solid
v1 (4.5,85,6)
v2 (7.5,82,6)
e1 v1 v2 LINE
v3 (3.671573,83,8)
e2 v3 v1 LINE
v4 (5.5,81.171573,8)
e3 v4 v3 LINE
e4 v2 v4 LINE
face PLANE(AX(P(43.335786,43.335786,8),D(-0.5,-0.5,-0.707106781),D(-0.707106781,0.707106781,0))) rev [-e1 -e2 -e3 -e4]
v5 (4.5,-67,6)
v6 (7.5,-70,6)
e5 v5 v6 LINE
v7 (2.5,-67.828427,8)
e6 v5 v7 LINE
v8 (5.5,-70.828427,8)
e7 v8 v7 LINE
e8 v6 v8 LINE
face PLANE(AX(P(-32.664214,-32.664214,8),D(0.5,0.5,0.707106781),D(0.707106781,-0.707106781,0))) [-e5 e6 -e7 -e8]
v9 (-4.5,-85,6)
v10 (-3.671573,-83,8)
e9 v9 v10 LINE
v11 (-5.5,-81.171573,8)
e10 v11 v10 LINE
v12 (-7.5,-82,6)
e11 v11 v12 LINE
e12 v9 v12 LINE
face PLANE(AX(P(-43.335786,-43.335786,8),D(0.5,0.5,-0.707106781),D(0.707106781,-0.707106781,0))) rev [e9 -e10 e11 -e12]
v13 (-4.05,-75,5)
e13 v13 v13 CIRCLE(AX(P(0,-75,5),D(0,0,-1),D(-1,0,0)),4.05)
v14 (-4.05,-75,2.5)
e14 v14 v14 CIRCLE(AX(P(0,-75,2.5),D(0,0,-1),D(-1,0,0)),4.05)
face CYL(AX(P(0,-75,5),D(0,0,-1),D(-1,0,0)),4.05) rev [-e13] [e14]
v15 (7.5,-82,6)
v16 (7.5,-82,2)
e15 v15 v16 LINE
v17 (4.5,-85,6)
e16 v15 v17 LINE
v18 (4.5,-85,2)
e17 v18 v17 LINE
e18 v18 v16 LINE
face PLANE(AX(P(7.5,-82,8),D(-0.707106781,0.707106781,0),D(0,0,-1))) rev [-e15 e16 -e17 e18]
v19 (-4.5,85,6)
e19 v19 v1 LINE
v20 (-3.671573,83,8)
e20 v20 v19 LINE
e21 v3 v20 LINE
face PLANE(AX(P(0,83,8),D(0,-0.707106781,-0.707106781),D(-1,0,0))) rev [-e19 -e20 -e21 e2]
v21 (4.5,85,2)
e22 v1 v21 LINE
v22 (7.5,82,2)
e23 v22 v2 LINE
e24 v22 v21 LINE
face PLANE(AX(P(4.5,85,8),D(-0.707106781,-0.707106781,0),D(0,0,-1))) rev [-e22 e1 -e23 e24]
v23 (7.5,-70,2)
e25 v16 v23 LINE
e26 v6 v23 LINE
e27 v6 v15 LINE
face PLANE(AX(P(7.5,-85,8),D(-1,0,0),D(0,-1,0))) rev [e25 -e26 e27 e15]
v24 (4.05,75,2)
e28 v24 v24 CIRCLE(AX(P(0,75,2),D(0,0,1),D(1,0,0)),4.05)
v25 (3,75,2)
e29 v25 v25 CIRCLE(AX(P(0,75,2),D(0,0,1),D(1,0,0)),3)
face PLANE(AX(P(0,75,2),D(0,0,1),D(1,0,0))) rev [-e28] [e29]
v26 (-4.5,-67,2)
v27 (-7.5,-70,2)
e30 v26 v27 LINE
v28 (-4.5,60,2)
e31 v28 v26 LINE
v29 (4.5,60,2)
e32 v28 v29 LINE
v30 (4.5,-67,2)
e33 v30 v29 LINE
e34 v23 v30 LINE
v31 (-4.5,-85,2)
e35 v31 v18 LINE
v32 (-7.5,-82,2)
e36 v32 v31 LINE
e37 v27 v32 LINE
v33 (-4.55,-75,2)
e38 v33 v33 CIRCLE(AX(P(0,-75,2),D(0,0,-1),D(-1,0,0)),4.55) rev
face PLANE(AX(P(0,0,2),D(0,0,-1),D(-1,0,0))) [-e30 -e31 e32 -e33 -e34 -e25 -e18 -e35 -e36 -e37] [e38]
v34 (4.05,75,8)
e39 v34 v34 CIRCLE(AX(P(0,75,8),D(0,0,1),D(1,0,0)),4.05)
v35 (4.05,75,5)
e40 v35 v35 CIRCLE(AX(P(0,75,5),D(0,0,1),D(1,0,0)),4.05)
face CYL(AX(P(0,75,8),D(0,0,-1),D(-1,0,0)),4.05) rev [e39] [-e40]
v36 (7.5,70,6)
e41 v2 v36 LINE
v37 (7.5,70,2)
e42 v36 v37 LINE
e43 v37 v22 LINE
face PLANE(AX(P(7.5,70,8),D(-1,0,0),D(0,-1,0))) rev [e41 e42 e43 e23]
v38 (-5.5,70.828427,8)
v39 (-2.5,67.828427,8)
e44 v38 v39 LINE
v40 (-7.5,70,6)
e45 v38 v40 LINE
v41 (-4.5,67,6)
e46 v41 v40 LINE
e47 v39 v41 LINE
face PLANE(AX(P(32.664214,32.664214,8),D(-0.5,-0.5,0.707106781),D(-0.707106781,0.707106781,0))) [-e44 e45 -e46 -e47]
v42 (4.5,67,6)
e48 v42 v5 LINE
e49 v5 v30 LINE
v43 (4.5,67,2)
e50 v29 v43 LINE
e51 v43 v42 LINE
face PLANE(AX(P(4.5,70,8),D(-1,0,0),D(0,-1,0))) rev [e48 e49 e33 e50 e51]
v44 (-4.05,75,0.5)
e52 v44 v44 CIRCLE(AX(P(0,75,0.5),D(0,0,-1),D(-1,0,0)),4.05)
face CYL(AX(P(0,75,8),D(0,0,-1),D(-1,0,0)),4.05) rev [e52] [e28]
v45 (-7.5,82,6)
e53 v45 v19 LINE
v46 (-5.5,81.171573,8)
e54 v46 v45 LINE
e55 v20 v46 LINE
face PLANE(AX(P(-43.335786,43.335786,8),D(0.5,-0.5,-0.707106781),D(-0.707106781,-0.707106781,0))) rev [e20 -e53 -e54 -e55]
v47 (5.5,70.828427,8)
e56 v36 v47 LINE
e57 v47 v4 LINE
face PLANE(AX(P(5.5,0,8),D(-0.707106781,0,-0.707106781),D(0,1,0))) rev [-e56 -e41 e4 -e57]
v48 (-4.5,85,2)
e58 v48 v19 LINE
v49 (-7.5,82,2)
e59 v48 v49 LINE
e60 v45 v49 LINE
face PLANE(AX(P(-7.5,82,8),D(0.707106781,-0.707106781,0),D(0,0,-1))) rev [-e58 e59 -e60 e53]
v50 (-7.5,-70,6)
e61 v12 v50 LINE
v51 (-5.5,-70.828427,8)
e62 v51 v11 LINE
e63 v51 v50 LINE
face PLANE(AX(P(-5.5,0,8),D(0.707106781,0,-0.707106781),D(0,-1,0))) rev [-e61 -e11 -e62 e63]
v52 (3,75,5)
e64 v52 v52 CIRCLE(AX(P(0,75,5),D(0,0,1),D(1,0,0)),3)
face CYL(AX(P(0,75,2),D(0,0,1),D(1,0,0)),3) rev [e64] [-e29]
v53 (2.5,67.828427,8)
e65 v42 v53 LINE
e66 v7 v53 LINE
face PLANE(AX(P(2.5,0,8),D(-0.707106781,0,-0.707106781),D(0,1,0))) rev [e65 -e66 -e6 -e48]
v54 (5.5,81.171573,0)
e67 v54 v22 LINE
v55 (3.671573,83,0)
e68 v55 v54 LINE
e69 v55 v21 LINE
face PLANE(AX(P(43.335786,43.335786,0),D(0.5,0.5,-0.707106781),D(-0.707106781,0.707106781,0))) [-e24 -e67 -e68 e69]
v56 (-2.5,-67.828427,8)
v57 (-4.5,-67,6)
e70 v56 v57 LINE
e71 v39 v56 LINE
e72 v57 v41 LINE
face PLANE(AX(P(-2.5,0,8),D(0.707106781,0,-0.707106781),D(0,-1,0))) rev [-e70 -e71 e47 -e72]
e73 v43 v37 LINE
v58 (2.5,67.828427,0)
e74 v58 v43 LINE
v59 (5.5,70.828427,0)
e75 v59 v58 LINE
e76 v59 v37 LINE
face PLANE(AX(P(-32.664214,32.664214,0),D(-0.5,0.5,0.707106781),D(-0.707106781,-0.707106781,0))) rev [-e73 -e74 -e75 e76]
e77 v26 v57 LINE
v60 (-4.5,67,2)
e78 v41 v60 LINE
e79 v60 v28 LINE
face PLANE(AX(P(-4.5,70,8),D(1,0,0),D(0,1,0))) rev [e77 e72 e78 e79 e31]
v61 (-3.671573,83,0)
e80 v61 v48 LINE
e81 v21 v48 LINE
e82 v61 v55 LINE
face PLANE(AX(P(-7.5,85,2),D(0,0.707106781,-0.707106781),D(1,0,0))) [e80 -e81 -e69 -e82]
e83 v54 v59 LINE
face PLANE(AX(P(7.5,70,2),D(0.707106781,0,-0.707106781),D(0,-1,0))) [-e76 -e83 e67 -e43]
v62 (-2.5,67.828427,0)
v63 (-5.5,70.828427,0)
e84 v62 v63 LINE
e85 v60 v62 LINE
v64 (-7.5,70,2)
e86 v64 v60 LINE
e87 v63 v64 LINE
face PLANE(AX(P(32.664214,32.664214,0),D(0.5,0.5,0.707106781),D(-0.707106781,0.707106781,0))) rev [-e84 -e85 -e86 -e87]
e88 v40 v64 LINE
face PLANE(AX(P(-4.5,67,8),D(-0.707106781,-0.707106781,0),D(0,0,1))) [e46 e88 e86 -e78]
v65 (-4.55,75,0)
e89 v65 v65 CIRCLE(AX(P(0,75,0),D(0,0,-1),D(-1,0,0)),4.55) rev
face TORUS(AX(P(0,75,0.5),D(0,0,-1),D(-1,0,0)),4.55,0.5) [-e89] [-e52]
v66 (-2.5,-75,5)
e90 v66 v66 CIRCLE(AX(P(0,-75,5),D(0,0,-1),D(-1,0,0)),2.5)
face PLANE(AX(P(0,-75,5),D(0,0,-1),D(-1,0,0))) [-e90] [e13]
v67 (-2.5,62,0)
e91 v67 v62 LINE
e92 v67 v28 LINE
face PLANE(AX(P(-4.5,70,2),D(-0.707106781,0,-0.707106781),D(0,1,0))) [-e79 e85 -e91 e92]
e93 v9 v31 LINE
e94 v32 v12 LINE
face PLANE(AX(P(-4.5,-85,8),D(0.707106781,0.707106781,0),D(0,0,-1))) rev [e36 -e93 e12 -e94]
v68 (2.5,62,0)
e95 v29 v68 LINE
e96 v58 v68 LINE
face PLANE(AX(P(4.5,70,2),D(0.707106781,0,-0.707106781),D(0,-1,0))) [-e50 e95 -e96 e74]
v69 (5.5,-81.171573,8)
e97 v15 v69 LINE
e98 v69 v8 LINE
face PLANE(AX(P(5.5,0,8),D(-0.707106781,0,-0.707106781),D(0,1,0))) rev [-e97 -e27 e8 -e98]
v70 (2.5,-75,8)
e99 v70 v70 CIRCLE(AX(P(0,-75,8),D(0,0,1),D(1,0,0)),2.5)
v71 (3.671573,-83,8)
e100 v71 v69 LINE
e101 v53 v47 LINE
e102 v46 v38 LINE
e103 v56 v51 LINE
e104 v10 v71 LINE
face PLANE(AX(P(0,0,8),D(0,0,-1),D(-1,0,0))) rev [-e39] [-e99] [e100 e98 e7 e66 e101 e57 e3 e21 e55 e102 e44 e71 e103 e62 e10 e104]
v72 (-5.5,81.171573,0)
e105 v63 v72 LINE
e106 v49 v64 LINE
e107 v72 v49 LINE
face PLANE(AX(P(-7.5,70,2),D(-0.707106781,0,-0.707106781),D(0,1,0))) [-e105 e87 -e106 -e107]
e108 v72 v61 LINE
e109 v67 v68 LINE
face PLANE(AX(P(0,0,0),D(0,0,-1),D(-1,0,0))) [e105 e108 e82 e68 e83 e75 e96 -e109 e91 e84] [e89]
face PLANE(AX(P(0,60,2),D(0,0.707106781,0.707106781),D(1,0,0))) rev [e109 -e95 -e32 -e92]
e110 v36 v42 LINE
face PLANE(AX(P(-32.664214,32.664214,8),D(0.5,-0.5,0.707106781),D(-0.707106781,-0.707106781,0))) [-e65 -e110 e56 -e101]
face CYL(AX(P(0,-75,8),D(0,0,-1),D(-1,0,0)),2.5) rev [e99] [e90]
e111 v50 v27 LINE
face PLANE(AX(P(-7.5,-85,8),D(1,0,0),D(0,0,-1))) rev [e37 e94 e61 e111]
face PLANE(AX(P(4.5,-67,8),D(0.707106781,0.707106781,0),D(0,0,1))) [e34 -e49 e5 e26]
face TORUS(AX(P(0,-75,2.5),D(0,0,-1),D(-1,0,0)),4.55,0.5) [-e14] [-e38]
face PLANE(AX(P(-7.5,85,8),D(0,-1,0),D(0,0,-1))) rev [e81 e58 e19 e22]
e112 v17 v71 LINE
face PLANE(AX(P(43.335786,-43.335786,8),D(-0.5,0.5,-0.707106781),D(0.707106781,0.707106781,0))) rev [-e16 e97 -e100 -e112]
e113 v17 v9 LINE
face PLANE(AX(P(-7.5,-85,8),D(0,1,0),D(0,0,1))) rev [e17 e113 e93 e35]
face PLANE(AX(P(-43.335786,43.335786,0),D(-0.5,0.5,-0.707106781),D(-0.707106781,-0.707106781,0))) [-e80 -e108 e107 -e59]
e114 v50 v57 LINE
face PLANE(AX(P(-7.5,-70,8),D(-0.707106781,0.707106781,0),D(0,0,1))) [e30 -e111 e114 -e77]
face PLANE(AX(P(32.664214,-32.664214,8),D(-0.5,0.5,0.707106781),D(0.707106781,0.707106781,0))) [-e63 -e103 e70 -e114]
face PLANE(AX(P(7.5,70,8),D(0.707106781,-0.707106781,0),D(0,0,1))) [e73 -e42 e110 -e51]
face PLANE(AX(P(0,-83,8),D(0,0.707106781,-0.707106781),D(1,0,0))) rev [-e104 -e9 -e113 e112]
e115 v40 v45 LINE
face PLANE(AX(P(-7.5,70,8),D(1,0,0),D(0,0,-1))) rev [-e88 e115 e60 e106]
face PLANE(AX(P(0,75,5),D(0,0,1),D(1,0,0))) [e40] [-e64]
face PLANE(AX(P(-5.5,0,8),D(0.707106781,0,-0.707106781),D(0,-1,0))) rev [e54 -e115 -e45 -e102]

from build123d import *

# Parameters (mm, degrees)
SKETCH_1_R           = 2.5
SKETCH_1_R_2         = 4.05
EXTRUDE_1_DEPTH      = 8
CHAMFER_2_SIZE       = 3
EXTRUDE_2_DEPTH      = 1
EXTRUDE_2_DEPTH_BACK = 2
SKETCH_2_R           = 4.05
SKETCH_2_R_2         = 3
CHAMFER_3_SIZE       = 2
CHAMFER_4_SIZE       = 2
FILLET_1_R           = 0.5
FILLET_2_R           = 0.5
SKETCH_3_W           = 18.755341831
SKETCH_3_H           = 148.115808698
CUT_EXTRUDE_1_DEPTH  = 2
CHAMFER_5_SIZE       = 2
SKETCH_4_R           = 4.05
CUT_EXTRUDE_2_DEPTH  = 3
FILLET_3_R           = 0.5


# Some blends are built 0.0001 mm under size
with BuildPart() as part:
    # 草图1 → 凸台-拉伸1 (new body)
    with BuildSketch(Plane.XY):
        Polygon((-7.5, 70), (-4.5, 70), (-4.5, -70), (-7.5, -70), (-7.5, -85), (7.5, -85), (7.5, -70), (4.5, -70), (4.5, 70), (7.5, 70), (7.5, 85), (-7.5, 85), align=None)
        with Locations((0, -75)):
            Circle(SKETCH_1_R, mode=Mode.SUBTRACT)
        with Locations((0, 75)):
            Circle(SKETCH_1_R_2, mode=Mode.SUBTRACT)
    extrude(amount=EXTRUDE_1_DEPTH)

    # 倒角2
    chamfer_2_edges = [part.edges().sort_by_distance(p)[0] for p in [
        (-4.5, -70, 4),
        (4.5, -70, 4),
        (-4.5, 70, 4),
        (4.5, 70, 4),
    ]]
    chamfer(chamfer_2_edges, length=CHAMFER_2_SIZE - 0.0001)  # a hair under: the kernel refuses the full size
    chamfer_2_2_edges = [part.edges().sort_by_distance(p)[0] for p in [
        (7.5, -85, 4),
        (-7.5, -85, 4),
        (7.5, 85, 4),
        (-7.5, 85, 4),
    ]]
    chamfer(chamfer_2_2_edges, length=CHAMFER_2_SIZE)

    # 草图2 → 凸台-拉伸2 (add, two sides: drawn at the far end of the back side and taken through both)
    with BuildSketch(Plane.XY.offset(4).offset(-EXTRUDE_2_DEPTH_BACK)):
        with Locations((0, 75)):
            Circle(SKETCH_2_R)
        with Locations((0, 75)):
            Circle(SKETCH_2_R_2, mode=Mode.SUBTRACT)
    extrude(amount=EXTRUDE_2_DEPTH + EXTRUDE_2_DEPTH_BACK)

    # 倒角3
    # the kernel refuses this chamfer: 2 mm, written as the material it takes off along each edge
    with BuildSketch(Plane(origin=(-7.5, -64.856634024, 8), x_dir=(-0.027495876610586487, 0, -0.9996219169112968), z_dir=(0, -1, 0)), Plane(origin=(7.5, -87.143365976, 8), x_dir=(0.027495876610586487, 0, -0.9996219169112968), z_dir=(0, 1, 0)), Plane(origin=(7.5, 64.856634024, 8), x_dir=(0.027495876610586487, 0, -0.9996219169112968), z_dir=(0, 1, 0)), Plane(origin=(-7.5, 87.143365976, 8), x_dir=(-0.027495876610586487, 0, -0.9996219169112968), z_dir=(0, -1, 0))) as chamfer_3_piece_1:
        Polygon((CHAMFER_3_SIZE * 0.999621916911, CHAMFER_3_SIZE * 0.0274958766106), (-CHAMFER_3_SIZE * 0.0274958766106, CHAMFER_3_SIZE * 0.999621916911), (0, 0), align=None)
    extrude(amount=22.286731952, mode=Mode.SUBTRACT)
    with BuildSketch(Plane(origin=(-4.5, 72.143465976, 8), x_dir=(-0.027495876610586487, 0, -0.9996219169112968), z_dir=(0, -1, 0))) as chamfer_3_piece_2_section:
        Polygon((CHAMFER_3_SIZE * 0.999621916911, CHAMFER_3_SIZE * 0.0274958766106), (-CHAMFER_3_SIZE * 0.0274958766106, CHAMFER_3_SIZE * 0.999621916911), (0, 0), align=None)
    chamfer_3_piece_2 = extrude(amount=144.286931952, mode=Mode.PRIVATE)
    chamfer_3_piece_2 = split(chamfer_3_piece_2, bisect_by=Plane(origin=(29.327929184, 33.172170816, 7.338365808), z_dir=(-0.7071067811865471, -0.7071067811865479, 0)), keep=Keep.TOP, mode=Mode.PRIVATE)
    chamfer_3_piece_2 = split(chamfer_3_piece_2, bisect_by=Plane(origin=(29.327929184, -33.172170816, 7.338365808), z_dir=(-0.7071067811865472, 0.7071067811865479, 0)), keep=Keep.TOP, mode=Mode.PRIVATE)
    add(chamfer_3_piece_2, mode=Mode.SUBTRACT)
    with BuildSketch(Plane(origin=(4.5, -72.143465976, 8), x_dir=(0.027495876610586487, 0, -0.9996219169112968), z_dir=(0, 1, 0))) as chamfer_3_piece_3_section:
        Polygon((CHAMFER_3_SIZE * 0.999621916911, CHAMFER_3_SIZE * 0.0274958766106), (-CHAMFER_3_SIZE * 0.0274958766106, CHAMFER_3_SIZE * 0.999621916911), (0, 0), align=None)
    chamfer_3_piece_3 = extrude(amount=144.286931952, mode=Mode.PRIVATE)
    chamfer_3_piece_3 = split(chamfer_3_piece_3, bisect_by=Plane(origin=(-29.327929184, 33.172170816, 7.338365808), z_dir=(0.7071067811865471, -0.7071067811865479, 0)), keep=Keep.TOP, mode=Mode.PRIVATE)
    chamfer_3_piece_3 = split(chamfer_3_piece_3, bisect_by=Plane(origin=(-29.327929184, -33.172170816, 7.338365808), z_dir=(0.7071067811865472, 0.7071067811865479, 0)), keep=Keep.TOP, mode=Mode.PRIVATE)
    add(chamfer_3_piece_3, mode=Mode.SUBTRACT)
    with BuildSketch(Plane(origin=(-9.643365976, -85, 8), x_dir=(0, -0.02749587661058907, -0.9996219169112965), z_dir=(1, 0, 0)), Plane(origin=(9.643365976, 85, 8), x_dir=(0, 0.02749587661058907, -0.9996219169112965), z_dir=(-1, 0, 0))) as chamfer_3_piece_4:
        Polygon((CHAMFER_3_SIZE * 0.999621916911, CHAMFER_3_SIZE * 0.0274958766106), (-CHAMFER_3_SIZE * 0.0274958766106, CHAMFER_3_SIZE * 0.999621916911), (0, 0), align=None)
    extrude(amount=19.286731952, mode=Mode.SUBTRACT)
    with BuildSketch(Plane(origin=(-11.13690896, 78.36309104, 8), x_dir=(-0.019442520806016377, 0.019442520806016377, -0.9996219169112965), z_dir=(0.7071067811865476, 0.7071067811865476, 0)), Plane(origin=(0.86309104, 88.63690896, 8), x_dir=(0.019442520806015953, 0.019442520806015946, -0.9996219169112968), z_dir=(0.7071067811865475, -0.7071067811865476, 0))) as chamfer_3_piece_5:
        Polygon((CHAMFER_3_SIZE * 0.999621916911, -CHAMFER_3_SIZE * 0.0274958766106), (-CHAMFER_3_SIZE * 0.0274958766106, -CHAMFER_3_SIZE * 0.999621916911), (0, 0), align=None)
    extrude(amount=14.529372639, mode=Mode.SUBTRACT)
    with BuildSketch(Plane(origin=(-11.13690896, -78.36309104, 8), x_dir=(-0.019442520806016377, -0.019442520806016377, -0.9996219169112965), z_dir=(0.7071067811865476, -0.7071067811865476, 0)), Plane(origin=(0.86309104, -88.63690896, 8), x_dir=(0.019442520806015953, -0.019442520806015946, -0.9996219169112968), z_dir=(0.7071067811865475, 0.7071067811865476, 0))) as chamfer_3_piece_6:
        Polygon((CHAMFER_3_SIZE * 0.999621916911, CHAMFER_3_SIZE * 0.0274958766106), (-CHAMFER_3_SIZE * 0.0274958766106, CHAMFER_3_SIZE * 0.999621916911), (0, 0), align=None)
    extrude(amount=14.529372639, mode=Mode.SUBTRACT)
    with BuildSketch(Plane(origin=(-0.86309104, -63.36319104, 8), x_dir=(-0.01944252080601354, 0.019442520806013556, -0.9996219169112968), z_dir=(-0.7071067811865479, -0.7071067811865472, 0))) as chamfer_3_piece_7_section:
        Polygon((CHAMFER_3_SIZE * 0.999621916911, CHAMFER_3_SIZE * 0.0274958766106), (-CHAMFER_3_SIZE * 0.0274958766106, CHAMFER_3_SIZE * 0.999621916911), (0, 0), align=None)
    chamfer_3_piece_7 = extrude(amount=14.529231218, mode=Mode.PRIVATE)
    chamfer_3_piece_7 = split(chamfer_3_piece_7, bisect_by=Plane(origin=(-4.5, -68.843566402, 7.247508302), z_dir=(-1, 0, 0)), keep=Keep.TOP, mode=Mode.PRIVATE)
    add(chamfer_3_piece_7, mode=Mode.SUBTRACT)
    with BuildSketch(Plane(origin=(11.13680896, -73.63690896, 8), x_dir=(0.019442520806015506, 0.019442520806015526, -0.9996219169112968), z_dir=(-0.7071067811865479, 0.7071067811865472, 0))) as chamfer_3_piece_8_section:
        Polygon((CHAMFER_3_SIZE * 0.999621916911, CHAMFER_3_SIZE * 0.0274958766106), (-CHAMFER_3_SIZE * 0.0274958766106, CHAMFER_3_SIZE * 0.999621916911), (0, 0), align=None)
    chamfer_3_piece_8 = extrude(amount=14.529231218, mode=Mode.PRIVATE)
    chamfer_3_piece_8 = split(chamfer_3_piece_8, bisect_by=Plane(origin=(4.5, -72.06712973, 7.36381375), z_dir=(1, 0, 0)), keep=Keep.TOP, mode=Mode.PRIVATE)
    add(chamfer_3_piece_8, mode=Mode.SUBTRACT)
    with BuildSketch(Plane(origin=(-11.13680896, 73.63690896, 8), x_dir=(-0.019442520806015506, -0.019442520806015526, -0.9996219169112968), z_dir=(0.7071067811865479, -0.7071067811865471, 0))) as chamfer_3_piece_9_section:
        Polygon((CHAMFER_3_SIZE * 0.999621916911, CHAMFER_3_SIZE * 0.0274958766106), (-CHAMFER_3_SIZE * 0.0274958766106, CHAMFER_3_SIZE * 0.999621916911), (0, 0), align=None)
    chamfer_3_piece_9 = extrude(amount=14.529231218, mode=Mode.PRIVATE)
    chamfer_3_piece_9 = split(chamfer_3_piece_9, bisect_by=Plane(origin=(-4.5, 72.06712973, 7.36381375), z_dir=(-1, 0, 0)), keep=Keep.TOP, mode=Mode.PRIVATE)
    add(chamfer_3_piece_9, mode=Mode.SUBTRACT)
    with BuildSketch(Plane(origin=(0.86309104, 63.36319104, 8), x_dir=(0.019442520806013806, -0.019442520806013826, -0.9996219169112968), z_dir=(0.7071067811865479, 0.7071067811865471, 0))) as chamfer_3_piece_10_section:
        Polygon((CHAMFER_3_SIZE * 0.999621916911, CHAMFER_3_SIZE * 0.0274958766106), (-CHAMFER_3_SIZE * 0.0274958766106, CHAMFER_3_SIZE * 0.999621916911), (0, 0), align=None)
    chamfer_3_piece_10 = extrude(amount=14.529231218, mode=Mode.PRIVATE)
    chamfer_3_piece_10 = split(chamfer_3_piece_10, bisect_by=Plane(origin=(4.5, 68.843566402, 7.247508302), z_dir=(1, 0, 0)), keep=Keep.TOP, mode=Mode.PRIVATE)
    add(chamfer_3_piece_10, mode=Mode.SUBTRACT)
    with BuildSketch(Plane(origin=(-11.13680896, 73.63690896, 8), x_dir=(-0.019442520806015506, -0.019442520806015526, -0.9996219169112968), z_dir=(0.7071067811865479, -0.7071067811865471, 0))) as chamfer_3_piece_11a_section:
        Polygon((CHAMFER_3_SIZE * 0.999621916911, CHAMFER_3_SIZE * 0.0274958766106), (-CHAMFER_3_SIZE * 0.0274958766106, CHAMFER_3_SIZE * 0.999621916911), (0, 0), align=None)
    chamfer_3_piece_11a = extrude(amount=14.529231218, mode=Mode.PRIVATE)
    chamfer_3_piece_11a = split(chamfer_3_piece_11a, bisect_by=Plane(origin=(-4.5, 65.927671271, 7.36381375), z_dir=(1, 0, 0)), keep=Keep.TOP, mode=Mode.PRIVATE)
    with BuildSketch(Plane(origin=(-4.5, 72.143465976, 8), x_dir=(-0.027495876610586487, 0, -0.9996219169112968), z_dir=(0, -1, 0))) as chamfer_3_piece_11b_section:
        Polygon((CHAMFER_3_SIZE * 0.999621916911, CHAMFER_3_SIZE * 0.0274958766106), (-CHAMFER_3_SIZE * 0.0274958766106, CHAMFER_3_SIZE * 0.999621916911), (0, 0), align=None)
    chamfer_3_piece_11b = extrude(amount=144.286931952, mode=Mode.PRIVATE)
    chamfer_3_piece_11b = split(chamfer_3_piece_11b, bisect_by=Plane(origin=(-5.258321627, 67.758421627, 7.36381375), z_dir=(0.7071067811865471, 0.7071067811865479, 0)), keep=Keep.TOP, mode=Mode.PRIVATE)
    chamfer_3_piece_11 = chamfer_3_piece_11a & chamfer_3_piece_11b
    add(chamfer_3_piece_11, mode=Mode.SUBTRACT)
    with BuildSketch(Plane(origin=(-4.5, 72.143465976, 8), x_dir=(-0.027495876610586487, 0, -0.9996219169112968), z_dir=(0, -1, 0))) as chamfer_3_piece_12a_section:
        Polygon((CHAMFER_3_SIZE * 0.999621916911, CHAMFER_3_SIZE * 0.0274958766106), (-CHAMFER_3_SIZE * 0.0274958766106, CHAMFER_3_SIZE * 0.999621916911), (0, 0), align=None)
    chamfer_3_piece_12a = extrude(amount=144.286931952, mode=Mode.PRIVATE)
    chamfer_3_piece_12a = split(chamfer_3_piece_12a, bisect_by=Plane(origin=(-5.258321627, -67.758421627, 7.36381375), z_dir=(0.7071067811865472, -0.7071067811865479, 0)), keep=Keep.TOP, mode=Mode.PRIVATE)
    with BuildSketch(Plane(origin=(-0.86309104, -63.36319104, 8), x_dir=(-0.01944252080601354, 0.019442520806013556, -0.9996219169112968), z_dir=(-0.7071067811865479, -0.7071067811865472, 0))) as chamfer_3_piece_12b_section:
        Polygon((CHAMFER_3_SIZE * 0.999621916911, CHAMFER_3_SIZE * 0.0274958766106), (-CHAMFER_3_SIZE * 0.0274958766106, CHAMFER_3_SIZE * 0.999621916911), (0, 0), align=None)
    chamfer_3_piece_12b = extrude(amount=14.529231218, mode=Mode.PRIVATE)
    chamfer_3_piece_12b = split(chamfer_3_piece_12b, bisect_by=Plane(origin=(-4.5, -65.927671271, 7.36381375), z_dir=(1, 0, 0)), keep=Keep.TOP, mode=Mode.PRIVATE)
    chamfer_3_piece_12 = chamfer_3_piece_12a & chamfer_3_piece_12b
    add(chamfer_3_piece_12, mode=Mode.SUBTRACT)
    with BuildSketch(Plane(origin=(4.5, -72.143465976, 8), x_dir=(0.027495876610586487, 0, -0.9996219169112968), z_dir=(0, 1, 0))) as chamfer_3_piece_13a_section:
        Polygon((CHAMFER_3_SIZE * 0.999621916911, CHAMFER_3_SIZE * 0.0274958766106), (-CHAMFER_3_SIZE * 0.0274958766106, CHAMFER_3_SIZE * 0.999621916911), (0, 0), align=None)
    chamfer_3_piece_13a = extrude(amount=144.286931952, mode=Mode.PRIVATE)
    chamfer_3_piece_13a = split(chamfer_3_piece_13a, bisect_by=Plane(origin=(5.258321627, -67.758421627, 7.36381375), z_dir=(-0.7071067811865472, -0.7071067811865479, 0)), keep=Keep.TOP, mode=Mode.PRIVATE)
    with BuildSketch(Plane(origin=(11.13680896, -73.63690896, 8), x_dir=(0.019442520806015506, 0.019442520806015526, -0.9996219169112968), z_dir=(-0.7071067811865479, 0.7071067811865472, 0))) as chamfer_3_piece_13b_section:
        Polygon((CHAMFER_3_SIZE * 0.999621916911, CHAMFER_3_SIZE * 0.0274958766106), (-CHAMFER_3_SIZE * 0.0274958766106, CHAMFER_3_SIZE * 0.999621916911), (0, 0), align=None)
    chamfer_3_piece_13b = extrude(amount=14.529231218, mode=Mode.PRIVATE)
    chamfer_3_piece_13b = split(chamfer_3_piece_13b, bisect_by=Plane(origin=(4.5, -65.927671271, 7.36381375), z_dir=(-1, 0, 0)), keep=Keep.TOP, mode=Mode.PRIVATE)
    chamfer_3_piece_13 = chamfer_3_piece_13a & chamfer_3_piece_13b
    add(chamfer_3_piece_13, mode=Mode.SUBTRACT)
    with BuildSketch(Plane(origin=(0.86309104, 63.36319104, 8), x_dir=(0.019442520806013806, -0.019442520806013826, -0.9996219169112968), z_dir=(0.7071067811865479, 0.7071067811865471, 0))) as chamfer_3_piece_14a_section:
        Polygon((CHAMFER_3_SIZE * 0.999621916911, CHAMFER_3_SIZE * 0.0274958766106), (-CHAMFER_3_SIZE * 0.0274958766106, CHAMFER_3_SIZE * 0.999621916911), (0, 0), align=None)
    chamfer_3_piece_14a = extrude(amount=14.529231218, mode=Mode.PRIVATE)
    chamfer_3_piece_14a = split(chamfer_3_piece_14a, bisect_by=Plane(origin=(4.5, 65.927671271, 7.36381375), z_dir=(-1, 0, 0)), keep=Keep.TOP, mode=Mode.PRIVATE)
    with BuildSketch(Plane(origin=(4.5, -72.143465976, 8), x_dir=(0.027495876610586487, 0, -0.9996219169112968), z_dir=(0, 1, 0))) as chamfer_3_piece_14b_section:
        Polygon((CHAMFER_3_SIZE * 0.999621916911, CHAMFER_3_SIZE * 0.0274958766106), (-CHAMFER_3_SIZE * 0.0274958766106, CHAMFER_3_SIZE * 0.999621916911), (0, 0), align=None)
    chamfer_3_piece_14b = extrude(amount=144.286931952, mode=Mode.PRIVATE)
    chamfer_3_piece_14b = split(chamfer_3_piece_14b, bisect_by=Plane(origin=(5.258321627, 67.758421627, 7.36381375), z_dir=(-0.7071067811865471, 0.7071067811865479, 0)), keep=Keep.TOP, mode=Mode.PRIVATE)
    chamfer_3_piece_14 = chamfer_3_piece_14a & chamfer_3_piece_14b
    add(chamfer_3_piece_14, mode=Mode.SUBTRACT)

    # 倒角4
    # the kernel refuses this chamfer: 2 mm, written as the material it takes off along each edge
    with BuildSketch(Plane(origin=(-7.5, -64.856634024, 0), x_dir=(0.9996219169112968, 0, -0.027495876610586365), z_dir=(0, -1, 0)), Plane(origin=(7.5, 64.856634024, 0), x_dir=(-0.9996219169112968, 0, -0.027495876610586365), z_dir=(0, 1, 0)), Plane(origin=(7.5, -87.143365976, 0), x_dir=(-0.9996219169112968, 0, -0.027495876610586365), z_dir=(0, 1, 0)), Plane(origin=(-7.5, 87.143365976, 0), x_dir=(0.9996219169112968, 0, -0.027495876610586365), z_dir=(0, -1, 0))) as chamfer_4_piece_1:
        Polygon((CHAMFER_4_SIZE * 0.999621916911, CHAMFER_4_SIZE * 0.0274958766106), (-CHAMFER_4_SIZE * 0.0274958766106, CHAMFER_4_SIZE * 0.999621916911), (0, 0), align=None)
    extrude(amount=22.286731952, mode=Mode.SUBTRACT)
    with BuildSketch(Plane(origin=(-4.5, 72.143465976, 0), x_dir=(0.9996219169112968, 0, -0.027495876610586372), z_dir=(0, -1, 0))) as chamfer_4_piece_2_section:
        Polygon((CHAMFER_4_SIZE * 0.999621916911, CHAMFER_4_SIZE * 0.0274958766106), (-CHAMFER_4_SIZE * 0.0274958766106, CHAMFER_4_SIZE * 0.999621916911), (0, 0), align=None)
    chamfer_4_piece_2 = extrude(amount=144.286931952, mode=Mode.PRIVATE)
    chamfer_4_piece_2 = split(chamfer_4_piece_2, bisect_by=Plane(origin=(29.327929184, -33.172170816, 0.661634192), z_dir=(-0.7071067811865472, 0.7071067811865479, 0)), keep=Keep.TOP, mode=Mode.PRIVATE)
    chamfer_4_piece_2 = split(chamfer_4_piece_2, bisect_by=Plane(origin=(29.327929184, 33.172170816, 0.661634192), z_dir=(-0.7071067811865471, -0.7071067811865479, 0)), keep=Keep.TOP, mode=Mode.PRIVATE)
    add(chamfer_4_piece_2, mode=Mode.SUBTRACT)
    with BuildSketch(Plane(origin=(4.5, -72.143465976, 0), x_dir=(-0.9996219169112968, 0, -0.027495876610586372), z_dir=(0, 1, 0))) as chamfer_4_piece_3_section:
        Polygon((CHAMFER_4_SIZE * 0.999621916911, CHAMFER_4_SIZE * 0.0274958766106), (-CHAMFER_4_SIZE * 0.0274958766106, CHAMFER_4_SIZE * 0.999621916911), (0, 0), align=None)
    chamfer_4_piece_3 = extrude(amount=144.286931952, mode=Mode.PRIVATE)
    chamfer_4_piece_3 = split(chamfer_4_piece_3, bisect_by=Plane(origin=(-29.327929184, -33.172170816, 0.661634192), z_dir=(0.7071067811865472, 0.7071067811865479, 0)), keep=Keep.TOP, mode=Mode.PRIVATE)
    chamfer_4_piece_3 = split(chamfer_4_piece_3, bisect_by=Plane(origin=(-29.327929184, 33.172170816, 0.661634192), z_dir=(0.7071067811865471, -0.7071067811865479, 0)), keep=Keep.TOP, mode=Mode.PRIVATE)
    add(chamfer_4_piece_3, mode=Mode.SUBTRACT)
    with BuildSketch(Plane(origin=(-9.643365976, -85, 0), x_dir=(0, 0.9996219169112968, -0.027495876610586292), z_dir=(1, 0, 0)), Plane(origin=(9.643365976, 85, 0), x_dir=(0, -0.9996219169112968, -0.027495876610586292), z_dir=(-1, 0, 0))) as chamfer_4_piece_4:
        Polygon((CHAMFER_4_SIZE * 0.999621916911, CHAMFER_4_SIZE * 0.0274958766106), (-CHAMFER_4_SIZE * 0.0274958766106, CHAMFER_4_SIZE * 0.999621916911), (0, 0), align=None)
    extrude(amount=19.286731952, mode=Mode.SUBTRACT)
    with BuildSketch(Plane(origin=(-11.13690896, 78.36309104, 0), x_dir=(0.7068394360706736, -0.7068394360706736, -0.02749587661058632), z_dir=(0.7071067811865476, 0.7071067811865476, 0)), Plane(origin=(0.86309104, 88.63690896, 0), x_dir=(-0.7068394360706736, -0.7068394360706735, -0.027495876610586348), z_dir=(0.7071067811865475, -0.7071067811865476, 0))) as chamfer_4_piece_5:
        Polygon((CHAMFER_4_SIZE * 0.999621916911, -CHAMFER_4_SIZE * 0.0274958766106), (-CHAMFER_4_SIZE * 0.0274958766106, -CHAMFER_4_SIZE * 0.999621916911), (0, 0), align=None)
    extrude(amount=14.529372639, mode=Mode.SUBTRACT)
    with BuildSketch(Plane(origin=(-11.13690896, -78.36309104, 0), x_dir=(0.7068394360706736, 0.7068394360706736, -0.02749587661058632), z_dir=(0.7071067811865476, -0.7071067811865476, 0)), Plane(origin=(0.86309104, -88.63690896, 0), x_dir=(-0.7068394360706736, 0.7068394360706735, -0.027495876610586348), z_dir=(0.7071067811865475, 0.7071067811865476, 0))) as chamfer_4_piece_6:
        Polygon((CHAMFER_4_SIZE * 0.999621916911, CHAMFER_4_SIZE * 0.0274958766106), (-CHAMFER_4_SIZE * 0.0274958766106, CHAMFER_4_SIZE * 0.999621916911), (0, 0), align=None)
    extrude(amount=14.529372639, mode=Mode.SUBTRACT)
    with BuildSketch(Plane(origin=(-0.86309104, -63.36319104, 0), x_dir=(0.7068394360706732, -0.7068394360706739, -0.027495876610586244), z_dir=(-0.7071067811865479, -0.7071067811865472, 0))) as chamfer_4_piece_7_section:
        Polygon((CHAMFER_4_SIZE * 0.999621916911, CHAMFER_4_SIZE * 0.0274958766106), (-CHAMFER_4_SIZE * 0.0274958766106, CHAMFER_4_SIZE * 0.999621916911), (0, 0), align=None)
    chamfer_4_piece_7 = extrude(amount=14.529231218, mode=Mode.PRIVATE)
    chamfer_4_piece_7 = split(chamfer_4_piece_7, bisect_by=Plane(origin=(-4.5, -68.843566402, 0.752491698), z_dir=(-1, 0, 0)), keep=Keep.TOP, mode=Mode.PRIVATE)
    add(chamfer_4_piece_7, mode=Mode.SUBTRACT)
    with BuildSketch(Plane(origin=(11.13680896, -73.63690896, 0), x_dir=(-0.7068394360706731, -0.7068394360706738, -0.027495876610586365), z_dir=(-0.7071067811865479, 0.7071067811865472, 0))) as chamfer_4_piece_8_section:
        Polygon((CHAMFER_4_SIZE * 0.999621916911, CHAMFER_4_SIZE * 0.0274958766106), (-CHAMFER_4_SIZE * 0.0274958766106, CHAMFER_4_SIZE * 0.999621916911), (0, 0), align=None)
    chamfer_4_piece_8 = extrude(amount=14.529231218, mode=Mode.PRIVATE)
    chamfer_4_piece_8 = split(chamfer_4_piece_8, bisect_by=Plane(origin=(4.5, -72.06712973, 0.63618625), z_dir=(1, 0, 0)), keep=Keep.TOP, mode=Mode.PRIVATE)
    add(chamfer_4_piece_8, mode=Mode.SUBTRACT)
    with BuildSketch(Plane(origin=(-11.13680896, 73.63690896, 0), x_dir=(0.706839436070673, 0.7068394360706739, -0.027495876610586376), z_dir=(0.7071067811865479, -0.7071067811865471, 0))) as chamfer_4_piece_9_section:
        Polygon((CHAMFER_4_SIZE * 0.999621916911, CHAMFER_4_SIZE * 0.0274958766106), (-CHAMFER_4_SIZE * 0.0274958766106, CHAMFER_4_SIZE * 0.999621916911), (0, 0), align=None)
    chamfer_4_piece_9 = extrude(amount=14.529231218, mode=Mode.PRIVATE)
    chamfer_4_piece_9 = split(chamfer_4_piece_9, bisect_by=Plane(origin=(-4.5, 72.06712973, 0.63618625), z_dir=(-1, 0, 0)), keep=Keep.TOP, mode=Mode.PRIVATE)
    add(chamfer_4_piece_9, mode=Mode.SUBTRACT)
    with BuildSketch(Plane(origin=(0.86309104, 63.36319104, 0), x_dir=(-0.7068394360706732, 0.7068394360706739, -0.02749587661058627), z_dir=(0.7071067811865479, 0.7071067811865471, 0))) as chamfer_4_piece_10_section:
        Polygon((CHAMFER_4_SIZE * 0.999621916911, CHAMFER_4_SIZE * 0.0274958766106), (-CHAMFER_4_SIZE * 0.0274958766106, CHAMFER_4_SIZE * 0.999621916911), (0, 0), align=None)
    chamfer_4_piece_10 = extrude(amount=14.529231218, mode=Mode.PRIVATE)
    chamfer_4_piece_10 = split(chamfer_4_piece_10, bisect_by=Plane(origin=(4.5, 68.843566402, 0.752491698), z_dir=(1, 0, 0)), keep=Keep.TOP, mode=Mode.PRIVATE)
    add(chamfer_4_piece_10, mode=Mode.SUBTRACT)
    with BuildSketch(Plane(origin=(-11.13680896, 73.63690896, 0), x_dir=(0.706839436070673, 0.7068394360706739, -0.027495876610586376), z_dir=(0.7071067811865479, -0.7071067811865471, 0))) as chamfer_4_piece_11a_section:
        Polygon((CHAMFER_4_SIZE * 0.999621916911, CHAMFER_4_SIZE * 0.0274958766106), (-CHAMFER_4_SIZE * 0.0274958766106, CHAMFER_4_SIZE * 0.999621916911), (0, 0), align=None)
    chamfer_4_piece_11a = extrude(amount=14.529231218, mode=Mode.PRIVATE)
    chamfer_4_piece_11a = split(chamfer_4_piece_11a, bisect_by=Plane(origin=(-4.5, 65.927671271, 0.63618625), z_dir=(1, 0, 0)), keep=Keep.TOP, mode=Mode.PRIVATE)
    with BuildSketch(Plane(origin=(-4.5, 72.143465976, 0), x_dir=(0.9996219169112968, 0, -0.027495876610586372), z_dir=(0, -1, 0))) as chamfer_4_piece_11b_section:
        Polygon((CHAMFER_4_SIZE * 0.999621916911, CHAMFER_4_SIZE * 0.0274958766106), (-CHAMFER_4_SIZE * 0.0274958766106, CHAMFER_4_SIZE * 0.999621916911), (0, 0), align=None)
    chamfer_4_piece_11b = extrude(amount=144.286931952, mode=Mode.PRIVATE)
    chamfer_4_piece_11b = split(chamfer_4_piece_11b, bisect_by=Plane(origin=(-5.258321627, 67.758421627, 0.63618625), z_dir=(0.7071067811865471, 0.7071067811865479, 0)), keep=Keep.TOP, mode=Mode.PRIVATE)
    chamfer_4_piece_11 = chamfer_4_piece_11a & chamfer_4_piece_11b
    add(chamfer_4_piece_11, mode=Mode.SUBTRACT)
    with BuildSketch(Plane(origin=(-4.5, 72.143465976, 0), x_dir=(0.9996219169112968, 0, -0.027495876610586372), z_dir=(0, -1, 0))) as chamfer_4_piece_12a_section:
        Polygon((CHAMFER_4_SIZE * 0.999621916911, CHAMFER_4_SIZE * 0.0274958766106), (-CHAMFER_4_SIZE * 0.0274958766106, CHAMFER_4_SIZE * 0.999621916911), (0, 0), align=None)
    chamfer_4_piece_12a = extrude(amount=144.286931952, mode=Mode.PRIVATE)
    chamfer_4_piece_12a = split(chamfer_4_piece_12a, bisect_by=Plane(origin=(-5.258321627, -67.758421627, 0.63618625), z_dir=(0.7071067811865472, -0.7071067811865479, 0)), keep=Keep.TOP, mode=Mode.PRIVATE)
    with BuildSketch(Plane(origin=(-0.86309104, -63.36319104, 0), x_dir=(0.7068394360706732, -0.7068394360706739, -0.027495876610586244), z_dir=(-0.7071067811865479, -0.7071067811865472, 0))) as chamfer_4_piece_12b_section:
        Polygon((CHAMFER_4_SIZE * 0.999621916911, CHAMFER_4_SIZE * 0.0274958766106), (-CHAMFER_4_SIZE * 0.0274958766106, CHAMFER_4_SIZE * 0.999621916911), (0, 0), align=None)
    chamfer_4_piece_12b = extrude(amount=14.529231218, mode=Mode.PRIVATE)
    chamfer_4_piece_12b = split(chamfer_4_piece_12b, bisect_by=Plane(origin=(-4.5, -65.927671271, 0.63618625), z_dir=(1, 0, 0)), keep=Keep.TOP, mode=Mode.PRIVATE)
    chamfer_4_piece_12 = chamfer_4_piece_12a & chamfer_4_piece_12b
    add(chamfer_4_piece_12, mode=Mode.SUBTRACT)
    with BuildSketch(Plane(origin=(4.5, -72.143465976, 0), x_dir=(-0.9996219169112968, 0, -0.027495876610586372), z_dir=(0, 1, 0))) as chamfer_4_piece_13a_section:
        Polygon((CHAMFER_4_SIZE * 0.999621916911, CHAMFER_4_SIZE * 0.0274958766106), (-CHAMFER_4_SIZE * 0.0274958766106, CHAMFER_4_SIZE * 0.999621916911), (0, 0), align=None)
    chamfer_4_piece_13a = extrude(amount=144.286931952, mode=Mode.PRIVATE)
    chamfer_4_piece_13a = split(chamfer_4_piece_13a, bisect_by=Plane(origin=(5.258321627, -67.758421627, 0.63618625), z_dir=(-0.7071067811865472, -0.7071067811865479, 0)), keep=Keep.TOP, mode=Mode.PRIVATE)
    with BuildSketch(Plane(origin=(11.13680896, -73.63690896, 0), x_dir=(-0.7068394360706731, -0.7068394360706738, -0.027495876610586365), z_dir=(-0.7071067811865479, 0.7071067811865472, 0))) as chamfer_4_piece_13b_section:
        Polygon((CHAMFER_4_SIZE * 0.999621916911, CHAMFER_4_SIZE * 0.0274958766106), (-CHAMFER_4_SIZE * 0.0274958766106, CHAMFER_4_SIZE * 0.999621916911), (0, 0), align=None)
    chamfer_4_piece_13b = extrude(amount=14.529231218, mode=Mode.PRIVATE)
    chamfer_4_piece_13b = split(chamfer_4_piece_13b, bisect_by=Plane(origin=(4.5, -65.927671271, 0.63618625), z_dir=(-1, 0, 0)), keep=Keep.TOP, mode=Mode.PRIVATE)
    chamfer_4_piece_13 = chamfer_4_piece_13a & chamfer_4_piece_13b
    add(chamfer_4_piece_13, mode=Mode.SUBTRACT)
    with BuildSketch(Plane(origin=(0.86309104, 63.36319104, 0), x_dir=(-0.7068394360706732, 0.7068394360706739, -0.02749587661058627), z_dir=(0.7071067811865479, 0.7071067811865471, 0))) as chamfer_4_piece_14a_section:
        Polygon((CHAMFER_4_SIZE * 0.999621916911, CHAMFER_4_SIZE * 0.0274958766106), (-CHAMFER_4_SIZE * 0.0274958766106, CHAMFER_4_SIZE * 0.999621916911), (0, 0), align=None)
    chamfer_4_piece_14a = extrude(amount=14.529231218, mode=Mode.PRIVATE)
    chamfer_4_piece_14a = split(chamfer_4_piece_14a, bisect_by=Plane(origin=(4.5, 65.927671271, 0.63618625), z_dir=(-1, 0, 0)), keep=Keep.TOP, mode=Mode.PRIVATE)
    with BuildSketch(Plane(origin=(4.5, -72.143465976, 0), x_dir=(-0.9996219169112968, 0, -0.027495876610586372), z_dir=(0, 1, 0))) as chamfer_4_piece_14b_section:
        Polygon((CHAMFER_4_SIZE * 0.999621916911, CHAMFER_4_SIZE * 0.0274958766106), (-CHAMFER_4_SIZE * 0.0274958766106, CHAMFER_4_SIZE * 0.999621916911), (0, 0), align=None)
    chamfer_4_piece_14b = extrude(amount=144.286931952, mode=Mode.PRIVATE)
    chamfer_4_piece_14b = split(chamfer_4_piece_14b, bisect_by=Plane(origin=(5.258321627, 67.758421627, 0.63618625), z_dir=(-0.7071067811865471, 0.7071067811865479, 0)), keep=Keep.TOP, mode=Mode.PRIVATE)
    chamfer_4_piece_14 = chamfer_4_piece_14a & chamfer_4_piece_14b
    add(chamfer_4_piece_14, mode=Mode.SUBTRACT)

    # 圆角1
    fillet_1_edges = [part.edges().sort_by_distance(p)[0] for p in [
        (-4.05, 75, 0),
    ]]
    fillet(fillet_1_edges, radius=FILLET_1_R)

    # 圆角2
    fillet_2_edges = [part.edges().sort_by_distance(p)[0] for p in [
        (-2.5, -75, 0),
    ]]
    fillet(fillet_2_edges, radius=FILLET_2_R)

    # 草图3 → 切除-拉伸1 (cut)
    with BuildSketch(Plane(origin=(0, 0, 0), x_dir=(-1, 0, 0), z_dir=(0, 0, -1))):
        with Locations((0.058364989, -12.057904349)):
            Rectangle(SKETCH_3_W, SKETCH_3_H)
    extrude(amount=-CUT_EXTRUDE_1_DEPTH, mode=Mode.SUBTRACT)

    # 倒角5
    chamfer_5_edges = [part.edges().sort_by_distance(p)[0] for p in [
        (0, 62, 2),
    ]]
    chamfer(chamfer_5_edges, length=CHAMFER_5_SIZE - 0.0001)  # a hair under: the kernel refuses the full size

    # 草图4 → 切除-拉伸2 (cut)
    with BuildSketch(Plane(origin=(0, 0, 2), x_dir=(-1, 0, 0), z_dir=(0, 0, -1))):
        with Locations((0, -75)):
            Circle(SKETCH_4_R)
    extrude(amount=-CUT_EXTRUDE_2_DEPTH, mode=Mode.SUBTRACT)

    # 圆角3
    fillet_3_edges = [part.edges().sort_by_distance(p)[0] for p in [
        (4.05, -75, 2),
    ]]
    fillet(fillet_3_edges, radius=FILLET_3_R)


solid = part.part
